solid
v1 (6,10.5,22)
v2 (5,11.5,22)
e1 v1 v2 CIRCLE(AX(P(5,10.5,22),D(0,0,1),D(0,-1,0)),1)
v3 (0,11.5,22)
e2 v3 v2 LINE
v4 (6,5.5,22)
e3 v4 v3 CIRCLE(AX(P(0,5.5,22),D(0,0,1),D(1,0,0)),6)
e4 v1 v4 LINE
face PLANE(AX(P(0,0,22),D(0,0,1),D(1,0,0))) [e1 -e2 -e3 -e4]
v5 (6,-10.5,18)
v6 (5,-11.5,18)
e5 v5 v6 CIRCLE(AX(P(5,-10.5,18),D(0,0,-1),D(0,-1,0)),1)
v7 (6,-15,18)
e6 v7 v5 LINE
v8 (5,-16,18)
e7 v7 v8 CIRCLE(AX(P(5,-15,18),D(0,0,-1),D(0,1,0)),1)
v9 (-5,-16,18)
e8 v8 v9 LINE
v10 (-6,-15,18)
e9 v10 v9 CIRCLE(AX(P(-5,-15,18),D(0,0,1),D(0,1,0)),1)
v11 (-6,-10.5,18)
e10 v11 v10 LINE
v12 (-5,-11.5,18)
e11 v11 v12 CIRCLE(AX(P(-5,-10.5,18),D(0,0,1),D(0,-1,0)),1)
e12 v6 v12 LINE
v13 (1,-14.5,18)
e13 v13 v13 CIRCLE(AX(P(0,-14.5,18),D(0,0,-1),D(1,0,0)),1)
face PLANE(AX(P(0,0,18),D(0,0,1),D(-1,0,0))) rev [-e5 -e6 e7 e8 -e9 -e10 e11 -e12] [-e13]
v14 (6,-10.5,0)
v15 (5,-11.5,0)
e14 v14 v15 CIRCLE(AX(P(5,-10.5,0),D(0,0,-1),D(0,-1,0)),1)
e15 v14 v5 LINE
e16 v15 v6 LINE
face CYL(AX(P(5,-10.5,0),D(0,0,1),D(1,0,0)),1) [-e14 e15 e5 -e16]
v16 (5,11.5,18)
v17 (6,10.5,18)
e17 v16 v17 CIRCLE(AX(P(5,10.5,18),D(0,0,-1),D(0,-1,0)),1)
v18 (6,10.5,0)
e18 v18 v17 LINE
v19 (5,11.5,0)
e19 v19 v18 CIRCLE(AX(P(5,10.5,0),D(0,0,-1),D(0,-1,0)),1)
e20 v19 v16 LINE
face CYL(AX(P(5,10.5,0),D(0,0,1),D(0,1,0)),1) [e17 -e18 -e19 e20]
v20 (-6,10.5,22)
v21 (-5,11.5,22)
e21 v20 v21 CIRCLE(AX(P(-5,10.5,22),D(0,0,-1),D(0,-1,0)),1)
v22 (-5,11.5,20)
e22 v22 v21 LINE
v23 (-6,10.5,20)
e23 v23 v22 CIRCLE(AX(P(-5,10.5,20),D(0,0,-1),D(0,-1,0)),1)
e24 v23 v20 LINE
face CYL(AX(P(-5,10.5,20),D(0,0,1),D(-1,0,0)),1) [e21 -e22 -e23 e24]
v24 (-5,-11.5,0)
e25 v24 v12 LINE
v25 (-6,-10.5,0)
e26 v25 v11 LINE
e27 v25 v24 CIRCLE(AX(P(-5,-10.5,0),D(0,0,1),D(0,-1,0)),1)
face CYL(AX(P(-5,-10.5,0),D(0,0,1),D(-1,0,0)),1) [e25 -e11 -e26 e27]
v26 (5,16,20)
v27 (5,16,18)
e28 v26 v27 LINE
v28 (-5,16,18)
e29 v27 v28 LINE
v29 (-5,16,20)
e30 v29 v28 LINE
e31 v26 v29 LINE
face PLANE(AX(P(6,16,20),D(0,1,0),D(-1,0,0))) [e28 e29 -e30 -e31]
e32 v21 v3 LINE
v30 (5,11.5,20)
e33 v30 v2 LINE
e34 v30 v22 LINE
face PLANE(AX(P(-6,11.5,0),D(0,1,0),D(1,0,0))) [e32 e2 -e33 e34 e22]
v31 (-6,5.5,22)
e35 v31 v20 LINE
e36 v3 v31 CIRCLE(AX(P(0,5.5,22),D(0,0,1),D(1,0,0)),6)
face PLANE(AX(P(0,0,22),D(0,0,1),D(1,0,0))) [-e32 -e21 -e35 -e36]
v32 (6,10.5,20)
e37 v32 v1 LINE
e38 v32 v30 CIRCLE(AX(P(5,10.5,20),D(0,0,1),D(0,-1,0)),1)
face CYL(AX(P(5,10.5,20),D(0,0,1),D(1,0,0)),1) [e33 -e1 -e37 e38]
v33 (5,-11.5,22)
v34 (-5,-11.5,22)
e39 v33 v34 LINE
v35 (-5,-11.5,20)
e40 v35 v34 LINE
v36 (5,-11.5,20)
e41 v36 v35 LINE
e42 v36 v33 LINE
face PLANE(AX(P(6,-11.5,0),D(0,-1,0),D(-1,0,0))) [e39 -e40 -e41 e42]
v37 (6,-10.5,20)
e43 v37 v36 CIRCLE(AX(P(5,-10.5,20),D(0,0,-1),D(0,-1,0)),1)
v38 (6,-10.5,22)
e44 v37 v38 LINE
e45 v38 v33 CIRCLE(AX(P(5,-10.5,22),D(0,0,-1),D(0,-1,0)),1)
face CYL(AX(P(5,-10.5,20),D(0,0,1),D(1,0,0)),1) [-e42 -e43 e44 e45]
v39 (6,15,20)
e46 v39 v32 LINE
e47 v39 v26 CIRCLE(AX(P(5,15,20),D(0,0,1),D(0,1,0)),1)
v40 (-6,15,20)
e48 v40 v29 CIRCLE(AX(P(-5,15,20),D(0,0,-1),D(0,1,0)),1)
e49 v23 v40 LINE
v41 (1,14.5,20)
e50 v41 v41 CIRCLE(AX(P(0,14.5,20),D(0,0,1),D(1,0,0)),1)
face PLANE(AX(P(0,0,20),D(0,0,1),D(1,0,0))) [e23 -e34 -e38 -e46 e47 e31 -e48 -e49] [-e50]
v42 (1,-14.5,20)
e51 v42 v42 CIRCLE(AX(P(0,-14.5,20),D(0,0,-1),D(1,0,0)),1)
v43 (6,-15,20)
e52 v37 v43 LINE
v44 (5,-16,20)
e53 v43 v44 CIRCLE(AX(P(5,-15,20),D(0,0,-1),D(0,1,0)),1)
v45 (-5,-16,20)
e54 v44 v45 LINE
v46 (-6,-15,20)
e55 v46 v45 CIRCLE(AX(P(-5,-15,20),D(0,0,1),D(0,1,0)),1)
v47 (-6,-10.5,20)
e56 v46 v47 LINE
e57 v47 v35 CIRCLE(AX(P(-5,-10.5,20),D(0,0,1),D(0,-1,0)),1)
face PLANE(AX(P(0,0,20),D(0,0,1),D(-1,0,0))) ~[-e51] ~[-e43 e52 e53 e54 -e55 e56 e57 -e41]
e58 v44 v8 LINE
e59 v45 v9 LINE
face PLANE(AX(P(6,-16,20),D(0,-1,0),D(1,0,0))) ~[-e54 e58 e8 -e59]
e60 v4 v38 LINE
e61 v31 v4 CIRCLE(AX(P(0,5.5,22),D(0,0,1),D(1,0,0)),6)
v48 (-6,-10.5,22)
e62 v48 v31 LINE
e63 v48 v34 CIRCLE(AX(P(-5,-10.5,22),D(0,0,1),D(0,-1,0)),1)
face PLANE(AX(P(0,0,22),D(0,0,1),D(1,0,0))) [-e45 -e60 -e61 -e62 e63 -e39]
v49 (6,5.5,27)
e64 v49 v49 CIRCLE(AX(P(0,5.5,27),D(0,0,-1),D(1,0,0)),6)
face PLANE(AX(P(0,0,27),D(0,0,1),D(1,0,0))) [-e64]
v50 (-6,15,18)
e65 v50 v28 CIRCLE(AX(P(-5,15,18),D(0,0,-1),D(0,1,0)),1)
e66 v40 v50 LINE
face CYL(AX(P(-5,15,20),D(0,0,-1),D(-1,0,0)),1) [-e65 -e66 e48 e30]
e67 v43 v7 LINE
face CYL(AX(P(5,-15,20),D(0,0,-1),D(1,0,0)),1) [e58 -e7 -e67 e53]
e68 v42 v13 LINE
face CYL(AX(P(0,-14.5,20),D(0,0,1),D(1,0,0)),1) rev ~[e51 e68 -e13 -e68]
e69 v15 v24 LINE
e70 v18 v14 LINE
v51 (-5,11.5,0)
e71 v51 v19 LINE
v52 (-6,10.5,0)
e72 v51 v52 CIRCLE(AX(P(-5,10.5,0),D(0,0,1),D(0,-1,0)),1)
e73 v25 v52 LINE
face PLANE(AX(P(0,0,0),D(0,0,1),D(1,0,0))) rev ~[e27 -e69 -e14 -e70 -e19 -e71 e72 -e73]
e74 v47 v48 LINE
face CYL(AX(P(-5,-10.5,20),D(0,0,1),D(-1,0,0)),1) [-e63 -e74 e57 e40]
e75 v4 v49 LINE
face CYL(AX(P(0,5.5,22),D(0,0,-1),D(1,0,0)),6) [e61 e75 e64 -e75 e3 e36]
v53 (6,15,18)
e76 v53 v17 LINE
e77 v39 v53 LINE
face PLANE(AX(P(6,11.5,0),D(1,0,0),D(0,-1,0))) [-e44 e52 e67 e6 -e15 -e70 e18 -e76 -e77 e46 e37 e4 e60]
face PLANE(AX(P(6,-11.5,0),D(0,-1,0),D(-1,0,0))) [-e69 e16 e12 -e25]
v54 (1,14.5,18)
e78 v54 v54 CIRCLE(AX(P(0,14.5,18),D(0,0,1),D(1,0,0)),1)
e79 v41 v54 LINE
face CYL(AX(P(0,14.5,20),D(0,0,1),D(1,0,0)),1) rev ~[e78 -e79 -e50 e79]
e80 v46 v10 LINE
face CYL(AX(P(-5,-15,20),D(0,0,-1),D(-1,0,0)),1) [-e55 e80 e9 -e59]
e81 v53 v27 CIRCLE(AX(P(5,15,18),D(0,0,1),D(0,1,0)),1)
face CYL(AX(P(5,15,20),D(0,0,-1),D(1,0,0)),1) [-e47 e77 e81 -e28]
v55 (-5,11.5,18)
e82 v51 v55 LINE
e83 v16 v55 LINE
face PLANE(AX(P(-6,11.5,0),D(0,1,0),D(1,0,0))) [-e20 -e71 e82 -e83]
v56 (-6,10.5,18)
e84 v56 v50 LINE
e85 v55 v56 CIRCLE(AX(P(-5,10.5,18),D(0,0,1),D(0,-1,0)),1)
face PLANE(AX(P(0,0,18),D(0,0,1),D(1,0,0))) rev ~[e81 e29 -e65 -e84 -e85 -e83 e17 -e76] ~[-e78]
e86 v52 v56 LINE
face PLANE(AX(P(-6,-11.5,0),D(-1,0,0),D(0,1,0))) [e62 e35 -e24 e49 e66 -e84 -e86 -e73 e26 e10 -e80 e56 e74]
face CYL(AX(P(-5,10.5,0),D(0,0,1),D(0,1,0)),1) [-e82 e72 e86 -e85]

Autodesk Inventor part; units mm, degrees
ref_plane "YZ Plane" through (0, 0, 0) normal (1, 0, 0) x (0, 1, 0)
ref_plane "XZ Plane" through (0, 0, 0) normal (0, 1, 0) x (-1, 0, 0)
sketch "Sketch1" plane through (0, 0, 0) normal (0, 0, 1) x (1, 0, 0)
  line L0 (-6, 11.5) -> (6, 11.5)
  line L1 (6, 11.5) -> (6, -11.5)
  line L2 (6, -11.5) -> (-6, -11.5)
  line L3 (-6, -11.5) -> (-6, 11.5)
  line L4 (0, 0) -> (0, -6.2119)
  line L5 (0, 0) -> (2.7529, 0)
  dimension "d0" = 12
  dimension "d1" = 23
extrude "Extrusion1" add sketch "Sketch1" along normal blind 22
ref_plane "Work Plane1" through (0, 0, 20) normal (0, 0, 1) x (1, 0, 0)
sketch "Sketch2" plane through (0, 0, 20) normal (0, 0, 1) x (1, 0, 0)
  line L0 (6, 11.5) -> (-6, 11.5) projected
  line L1 (-6, 11.5) -> (6, 11.5)
  line L2 (6, 11.5) -> (6, 16)
  line L3 (6, 16) -> (-6, 16)
  line L4 (-6, 16) -> (-6, 11.5)
  line L5 (6, -11.5) -> (6, 11.5) projected
  point P0 (0, 0)
  dimension "d5" = 4.5
extrude "Extrusion2" add sketch "Sketch2" against normal blind 2
sketch "Sketch3" plane through (0, 0, 20) normal (0, 0, 1) x (1, 0, 0)
  circle A0 centre (0, 14.5) radius 1
  line L0 (6, 16) -> (-6, 16) projected
  point P0 (0, 0)
  dimension "d8" = 2
  dimension "d9" = 1.5
extrude "Extrusion3" cut sketch "Sketch3" against normal blind 2
fillet "Fillet1" radius 1 6 edges at (6, 16, 19) (-6, 16, 19) (6, 11.5, 9) (6, 11.5, 21) (-6, 11.5, 21) (-6, 11.5, 9)
mirror "Mirror1" about plane through (0, 0, 0) normal (0, 1, 0) of "Extrusion2", "Extrusion3", "Fillet1"
fillet_without_effect "Fillet2"
sketch "Sketch4" plane through (0, 0, 22) normal (0, 0, 1) x (1, 0, 0)
  circle A0 centre (0, 5.5) radius 6
  line L0 (5, 11.5) -> (-5, 11.5) projected
  point P0 (0, 0)
  dimension "d14" = 12
extrude "Extrusion4" add sketch "Sketch4" along normal blind 5
properties part number "MicroServo"
